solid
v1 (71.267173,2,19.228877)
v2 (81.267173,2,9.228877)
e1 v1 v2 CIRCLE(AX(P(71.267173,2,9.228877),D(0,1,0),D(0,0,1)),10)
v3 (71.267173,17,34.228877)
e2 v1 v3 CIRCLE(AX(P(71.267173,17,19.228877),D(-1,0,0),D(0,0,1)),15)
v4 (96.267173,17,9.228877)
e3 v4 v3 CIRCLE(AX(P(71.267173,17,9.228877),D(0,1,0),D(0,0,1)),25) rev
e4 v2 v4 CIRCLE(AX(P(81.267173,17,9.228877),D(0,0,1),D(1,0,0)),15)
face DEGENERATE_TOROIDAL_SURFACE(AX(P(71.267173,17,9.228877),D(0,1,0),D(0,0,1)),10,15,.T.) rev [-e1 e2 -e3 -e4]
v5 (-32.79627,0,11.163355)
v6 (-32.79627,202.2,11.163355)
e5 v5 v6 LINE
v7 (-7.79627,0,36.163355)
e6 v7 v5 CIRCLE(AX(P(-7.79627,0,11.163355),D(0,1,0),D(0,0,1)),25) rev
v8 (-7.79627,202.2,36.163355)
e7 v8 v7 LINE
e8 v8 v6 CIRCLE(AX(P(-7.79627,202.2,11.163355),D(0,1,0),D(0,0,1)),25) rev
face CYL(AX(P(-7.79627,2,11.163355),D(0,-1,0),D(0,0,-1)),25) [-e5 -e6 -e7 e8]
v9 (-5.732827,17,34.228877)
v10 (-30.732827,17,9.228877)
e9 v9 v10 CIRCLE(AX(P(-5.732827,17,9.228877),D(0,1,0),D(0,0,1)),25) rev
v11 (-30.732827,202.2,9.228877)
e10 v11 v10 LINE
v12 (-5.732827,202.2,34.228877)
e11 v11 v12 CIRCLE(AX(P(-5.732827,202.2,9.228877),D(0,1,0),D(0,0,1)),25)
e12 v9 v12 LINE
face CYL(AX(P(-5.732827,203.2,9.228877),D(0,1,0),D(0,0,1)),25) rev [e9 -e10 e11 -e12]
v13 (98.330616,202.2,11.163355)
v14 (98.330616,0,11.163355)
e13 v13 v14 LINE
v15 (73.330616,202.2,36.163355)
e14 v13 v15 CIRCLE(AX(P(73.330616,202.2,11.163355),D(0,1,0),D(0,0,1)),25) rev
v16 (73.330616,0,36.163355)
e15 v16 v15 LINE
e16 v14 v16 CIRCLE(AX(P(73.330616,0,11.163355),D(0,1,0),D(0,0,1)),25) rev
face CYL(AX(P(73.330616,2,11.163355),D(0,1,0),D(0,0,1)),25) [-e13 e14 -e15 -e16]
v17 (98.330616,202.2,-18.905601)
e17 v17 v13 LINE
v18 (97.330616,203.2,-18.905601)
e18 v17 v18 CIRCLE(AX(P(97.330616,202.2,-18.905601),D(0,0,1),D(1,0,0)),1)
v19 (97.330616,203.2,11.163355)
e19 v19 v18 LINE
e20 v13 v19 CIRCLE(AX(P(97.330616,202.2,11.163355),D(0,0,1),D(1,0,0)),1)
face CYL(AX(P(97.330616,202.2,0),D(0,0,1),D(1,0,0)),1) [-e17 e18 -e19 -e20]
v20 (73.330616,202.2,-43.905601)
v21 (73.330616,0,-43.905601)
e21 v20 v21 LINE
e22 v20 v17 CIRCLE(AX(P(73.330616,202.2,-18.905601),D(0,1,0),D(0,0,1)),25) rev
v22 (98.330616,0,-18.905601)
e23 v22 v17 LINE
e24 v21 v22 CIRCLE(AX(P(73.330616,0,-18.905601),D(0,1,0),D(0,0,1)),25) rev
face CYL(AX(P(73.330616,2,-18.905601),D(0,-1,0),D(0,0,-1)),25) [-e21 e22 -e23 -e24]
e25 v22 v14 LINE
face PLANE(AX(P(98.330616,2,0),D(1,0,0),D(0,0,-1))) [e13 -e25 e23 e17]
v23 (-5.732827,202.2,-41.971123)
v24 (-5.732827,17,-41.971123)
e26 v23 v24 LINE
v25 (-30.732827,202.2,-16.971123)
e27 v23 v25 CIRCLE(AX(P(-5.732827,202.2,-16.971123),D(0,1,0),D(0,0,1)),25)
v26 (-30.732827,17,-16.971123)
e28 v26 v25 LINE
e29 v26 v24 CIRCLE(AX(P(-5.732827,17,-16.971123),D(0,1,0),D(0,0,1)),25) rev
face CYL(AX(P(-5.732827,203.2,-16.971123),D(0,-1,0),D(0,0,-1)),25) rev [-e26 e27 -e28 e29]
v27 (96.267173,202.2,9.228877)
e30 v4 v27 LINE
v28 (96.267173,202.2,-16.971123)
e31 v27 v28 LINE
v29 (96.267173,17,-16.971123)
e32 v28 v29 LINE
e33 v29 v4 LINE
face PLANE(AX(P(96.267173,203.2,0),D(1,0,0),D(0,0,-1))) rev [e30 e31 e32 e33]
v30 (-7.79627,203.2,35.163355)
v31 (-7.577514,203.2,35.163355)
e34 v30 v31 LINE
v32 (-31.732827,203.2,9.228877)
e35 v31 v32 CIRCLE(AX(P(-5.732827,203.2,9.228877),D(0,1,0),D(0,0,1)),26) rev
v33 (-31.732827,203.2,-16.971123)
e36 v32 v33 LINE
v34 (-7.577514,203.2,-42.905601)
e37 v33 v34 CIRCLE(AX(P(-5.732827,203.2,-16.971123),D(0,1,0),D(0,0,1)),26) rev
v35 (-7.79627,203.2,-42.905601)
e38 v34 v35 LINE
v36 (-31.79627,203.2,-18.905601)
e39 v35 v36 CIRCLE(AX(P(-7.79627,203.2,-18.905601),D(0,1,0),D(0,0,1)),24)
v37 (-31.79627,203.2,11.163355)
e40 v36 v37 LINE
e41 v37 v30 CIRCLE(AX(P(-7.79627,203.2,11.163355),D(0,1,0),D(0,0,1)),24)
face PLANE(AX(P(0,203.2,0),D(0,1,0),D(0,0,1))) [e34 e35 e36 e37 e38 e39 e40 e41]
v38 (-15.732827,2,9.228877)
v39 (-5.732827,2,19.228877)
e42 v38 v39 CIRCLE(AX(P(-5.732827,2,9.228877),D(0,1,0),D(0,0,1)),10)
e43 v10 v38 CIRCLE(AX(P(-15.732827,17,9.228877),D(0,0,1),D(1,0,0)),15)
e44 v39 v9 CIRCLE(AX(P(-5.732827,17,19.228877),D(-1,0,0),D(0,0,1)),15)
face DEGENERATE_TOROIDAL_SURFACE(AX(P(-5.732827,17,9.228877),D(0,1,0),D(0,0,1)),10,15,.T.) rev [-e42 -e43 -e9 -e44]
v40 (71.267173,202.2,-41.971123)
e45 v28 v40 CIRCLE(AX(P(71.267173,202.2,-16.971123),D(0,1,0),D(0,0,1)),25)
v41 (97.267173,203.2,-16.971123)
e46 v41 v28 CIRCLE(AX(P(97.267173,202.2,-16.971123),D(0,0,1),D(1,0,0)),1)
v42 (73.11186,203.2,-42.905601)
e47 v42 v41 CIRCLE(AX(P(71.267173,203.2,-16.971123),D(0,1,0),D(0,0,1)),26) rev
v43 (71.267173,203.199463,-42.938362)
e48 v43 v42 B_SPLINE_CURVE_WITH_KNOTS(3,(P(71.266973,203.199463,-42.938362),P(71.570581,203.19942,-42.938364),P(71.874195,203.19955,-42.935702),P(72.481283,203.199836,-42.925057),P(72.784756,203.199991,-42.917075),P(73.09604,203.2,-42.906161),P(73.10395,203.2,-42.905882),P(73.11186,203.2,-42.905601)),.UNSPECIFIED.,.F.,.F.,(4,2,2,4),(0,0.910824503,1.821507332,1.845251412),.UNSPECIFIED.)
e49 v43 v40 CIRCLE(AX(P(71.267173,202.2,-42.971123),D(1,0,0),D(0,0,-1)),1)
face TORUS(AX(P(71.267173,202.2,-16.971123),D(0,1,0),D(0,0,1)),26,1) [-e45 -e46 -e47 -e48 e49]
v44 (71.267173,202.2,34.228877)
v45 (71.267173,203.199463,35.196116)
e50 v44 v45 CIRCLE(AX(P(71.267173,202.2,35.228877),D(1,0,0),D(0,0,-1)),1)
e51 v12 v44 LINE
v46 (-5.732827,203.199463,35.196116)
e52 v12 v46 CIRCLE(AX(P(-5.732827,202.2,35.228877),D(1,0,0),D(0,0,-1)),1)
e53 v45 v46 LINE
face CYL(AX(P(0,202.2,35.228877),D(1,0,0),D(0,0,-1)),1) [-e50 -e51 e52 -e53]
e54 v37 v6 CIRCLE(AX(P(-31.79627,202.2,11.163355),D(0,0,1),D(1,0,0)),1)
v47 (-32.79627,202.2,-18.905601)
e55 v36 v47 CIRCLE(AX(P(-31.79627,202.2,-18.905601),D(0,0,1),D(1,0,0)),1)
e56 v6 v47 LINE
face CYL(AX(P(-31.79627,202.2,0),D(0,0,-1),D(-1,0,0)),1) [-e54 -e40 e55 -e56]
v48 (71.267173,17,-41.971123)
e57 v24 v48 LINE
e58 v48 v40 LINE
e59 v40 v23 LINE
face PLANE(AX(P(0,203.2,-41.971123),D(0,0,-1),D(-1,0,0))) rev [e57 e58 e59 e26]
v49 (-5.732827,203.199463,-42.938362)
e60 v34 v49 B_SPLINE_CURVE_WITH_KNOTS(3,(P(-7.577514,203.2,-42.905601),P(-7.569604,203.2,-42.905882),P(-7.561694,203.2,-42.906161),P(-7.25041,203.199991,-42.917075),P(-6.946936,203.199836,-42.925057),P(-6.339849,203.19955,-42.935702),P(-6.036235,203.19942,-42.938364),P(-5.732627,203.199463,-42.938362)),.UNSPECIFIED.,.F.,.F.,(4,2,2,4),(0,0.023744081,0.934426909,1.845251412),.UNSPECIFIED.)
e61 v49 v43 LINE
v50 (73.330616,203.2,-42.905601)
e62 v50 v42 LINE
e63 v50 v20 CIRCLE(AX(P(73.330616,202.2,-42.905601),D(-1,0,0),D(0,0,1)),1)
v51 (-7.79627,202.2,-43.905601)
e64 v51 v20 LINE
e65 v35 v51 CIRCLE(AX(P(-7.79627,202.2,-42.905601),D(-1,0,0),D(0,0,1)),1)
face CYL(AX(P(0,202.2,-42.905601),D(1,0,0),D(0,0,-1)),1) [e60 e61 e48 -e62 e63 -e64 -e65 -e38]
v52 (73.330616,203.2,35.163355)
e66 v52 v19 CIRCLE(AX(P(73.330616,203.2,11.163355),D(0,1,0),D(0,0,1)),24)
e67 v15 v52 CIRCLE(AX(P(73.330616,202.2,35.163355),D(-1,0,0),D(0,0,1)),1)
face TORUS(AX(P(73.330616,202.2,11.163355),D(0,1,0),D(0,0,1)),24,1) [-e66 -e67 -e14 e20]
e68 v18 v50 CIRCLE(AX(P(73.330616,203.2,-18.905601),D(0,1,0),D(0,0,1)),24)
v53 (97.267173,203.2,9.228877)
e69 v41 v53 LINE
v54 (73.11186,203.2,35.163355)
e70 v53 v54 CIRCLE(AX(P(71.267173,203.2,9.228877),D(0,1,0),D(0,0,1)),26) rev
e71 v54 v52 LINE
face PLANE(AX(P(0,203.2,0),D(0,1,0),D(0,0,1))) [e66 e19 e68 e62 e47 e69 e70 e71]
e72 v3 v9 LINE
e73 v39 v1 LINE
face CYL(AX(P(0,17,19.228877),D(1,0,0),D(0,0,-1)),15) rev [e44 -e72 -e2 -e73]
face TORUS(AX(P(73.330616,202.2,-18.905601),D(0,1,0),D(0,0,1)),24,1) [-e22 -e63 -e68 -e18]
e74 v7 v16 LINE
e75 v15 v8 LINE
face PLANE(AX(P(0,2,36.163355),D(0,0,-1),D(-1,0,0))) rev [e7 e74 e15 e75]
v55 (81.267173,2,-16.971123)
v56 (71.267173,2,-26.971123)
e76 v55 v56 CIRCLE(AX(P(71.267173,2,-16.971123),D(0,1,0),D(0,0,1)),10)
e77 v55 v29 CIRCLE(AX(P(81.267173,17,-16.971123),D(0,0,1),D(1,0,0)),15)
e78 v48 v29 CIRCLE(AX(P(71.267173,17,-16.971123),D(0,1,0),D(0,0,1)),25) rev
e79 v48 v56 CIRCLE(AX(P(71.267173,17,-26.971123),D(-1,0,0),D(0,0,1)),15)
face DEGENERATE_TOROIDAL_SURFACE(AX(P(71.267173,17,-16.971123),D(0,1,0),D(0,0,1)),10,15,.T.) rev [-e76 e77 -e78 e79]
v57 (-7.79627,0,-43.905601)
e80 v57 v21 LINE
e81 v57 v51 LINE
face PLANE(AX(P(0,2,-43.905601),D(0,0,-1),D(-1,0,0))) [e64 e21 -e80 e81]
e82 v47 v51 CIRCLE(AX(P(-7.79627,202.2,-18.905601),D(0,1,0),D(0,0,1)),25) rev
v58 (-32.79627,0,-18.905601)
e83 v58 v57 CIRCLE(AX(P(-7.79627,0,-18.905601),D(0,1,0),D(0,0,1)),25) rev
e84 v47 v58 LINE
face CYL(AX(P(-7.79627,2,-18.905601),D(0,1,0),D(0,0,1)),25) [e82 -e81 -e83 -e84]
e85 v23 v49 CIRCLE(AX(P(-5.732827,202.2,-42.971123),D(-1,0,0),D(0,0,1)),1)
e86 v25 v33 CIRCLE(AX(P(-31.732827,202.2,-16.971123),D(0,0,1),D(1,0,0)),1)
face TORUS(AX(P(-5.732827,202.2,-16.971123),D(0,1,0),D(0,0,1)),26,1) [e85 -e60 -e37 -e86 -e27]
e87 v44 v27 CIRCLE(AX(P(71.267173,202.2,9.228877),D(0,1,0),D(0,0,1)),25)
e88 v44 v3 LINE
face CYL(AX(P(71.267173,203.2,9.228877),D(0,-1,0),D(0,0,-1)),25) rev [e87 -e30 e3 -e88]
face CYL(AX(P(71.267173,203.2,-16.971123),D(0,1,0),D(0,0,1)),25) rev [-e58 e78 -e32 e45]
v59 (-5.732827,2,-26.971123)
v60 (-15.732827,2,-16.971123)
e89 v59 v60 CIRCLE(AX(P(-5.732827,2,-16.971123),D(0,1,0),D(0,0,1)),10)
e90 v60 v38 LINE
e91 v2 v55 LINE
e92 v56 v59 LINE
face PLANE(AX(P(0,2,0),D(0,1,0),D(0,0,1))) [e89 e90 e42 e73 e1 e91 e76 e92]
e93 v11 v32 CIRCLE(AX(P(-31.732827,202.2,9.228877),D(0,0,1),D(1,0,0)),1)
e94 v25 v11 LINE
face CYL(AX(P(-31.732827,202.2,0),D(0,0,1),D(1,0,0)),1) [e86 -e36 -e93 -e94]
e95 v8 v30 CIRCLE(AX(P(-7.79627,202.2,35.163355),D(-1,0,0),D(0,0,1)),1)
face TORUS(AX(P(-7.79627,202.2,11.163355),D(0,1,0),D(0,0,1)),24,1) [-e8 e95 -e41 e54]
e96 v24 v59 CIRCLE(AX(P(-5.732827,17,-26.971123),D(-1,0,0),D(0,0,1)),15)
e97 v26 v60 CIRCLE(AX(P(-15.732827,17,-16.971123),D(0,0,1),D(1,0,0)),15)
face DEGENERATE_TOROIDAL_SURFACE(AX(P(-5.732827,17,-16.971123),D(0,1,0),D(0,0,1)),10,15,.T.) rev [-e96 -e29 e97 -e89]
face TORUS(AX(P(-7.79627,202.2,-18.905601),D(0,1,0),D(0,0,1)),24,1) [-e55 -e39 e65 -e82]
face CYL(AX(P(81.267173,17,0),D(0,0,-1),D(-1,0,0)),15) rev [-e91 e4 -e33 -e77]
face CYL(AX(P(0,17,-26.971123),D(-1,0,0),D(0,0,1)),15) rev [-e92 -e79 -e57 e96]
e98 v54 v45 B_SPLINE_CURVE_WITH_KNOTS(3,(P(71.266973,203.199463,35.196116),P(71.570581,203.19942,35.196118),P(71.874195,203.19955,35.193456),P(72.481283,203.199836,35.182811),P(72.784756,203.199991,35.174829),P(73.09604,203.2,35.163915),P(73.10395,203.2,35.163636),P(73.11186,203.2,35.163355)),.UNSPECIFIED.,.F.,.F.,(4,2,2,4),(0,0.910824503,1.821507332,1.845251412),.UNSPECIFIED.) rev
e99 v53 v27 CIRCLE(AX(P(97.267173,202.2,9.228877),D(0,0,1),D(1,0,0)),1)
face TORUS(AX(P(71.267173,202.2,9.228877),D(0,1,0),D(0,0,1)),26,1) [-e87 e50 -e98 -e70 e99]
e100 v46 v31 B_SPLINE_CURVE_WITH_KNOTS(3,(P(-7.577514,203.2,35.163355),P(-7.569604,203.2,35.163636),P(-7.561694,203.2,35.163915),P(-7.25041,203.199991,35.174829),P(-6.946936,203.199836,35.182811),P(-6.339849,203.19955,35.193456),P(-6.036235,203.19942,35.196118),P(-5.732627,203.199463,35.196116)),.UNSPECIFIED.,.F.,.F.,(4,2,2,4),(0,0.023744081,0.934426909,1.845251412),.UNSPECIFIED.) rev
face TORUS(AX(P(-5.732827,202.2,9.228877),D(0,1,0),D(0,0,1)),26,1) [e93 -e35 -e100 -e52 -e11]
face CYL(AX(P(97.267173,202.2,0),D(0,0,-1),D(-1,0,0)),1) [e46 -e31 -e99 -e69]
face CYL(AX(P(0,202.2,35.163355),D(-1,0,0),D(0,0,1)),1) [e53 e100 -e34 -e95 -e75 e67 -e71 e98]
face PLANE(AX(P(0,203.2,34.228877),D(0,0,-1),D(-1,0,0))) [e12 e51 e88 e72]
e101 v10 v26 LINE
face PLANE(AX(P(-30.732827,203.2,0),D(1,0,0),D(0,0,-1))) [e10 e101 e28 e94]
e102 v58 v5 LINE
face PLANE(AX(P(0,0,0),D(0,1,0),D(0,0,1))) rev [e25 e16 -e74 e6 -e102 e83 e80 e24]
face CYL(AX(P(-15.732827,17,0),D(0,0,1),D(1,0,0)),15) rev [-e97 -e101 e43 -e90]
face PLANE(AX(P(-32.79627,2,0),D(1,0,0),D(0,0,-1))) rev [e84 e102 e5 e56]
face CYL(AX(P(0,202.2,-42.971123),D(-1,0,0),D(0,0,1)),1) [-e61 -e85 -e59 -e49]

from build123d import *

# Parameters (mm, degrees)
SKETCH1_W           = 127
SKETCH1_H           = 76.2
BOSS_EXTRUDE1_DEPTH = 2
BOSS_EXTRUDE2_DEPTH = 203.2
FILLET2_R           = 25
FILLET3_R           = 15
FILLET4_R           = 1


with BuildPart() as part:
    # Sketch1 → Boss-Extrude1 (new body)
    with BuildSketch(Plane(origin=(0, 0, 0), x_dir=(1, 0, 0), z_dir=(0, 1, 0))):
        with Locations((32.767173068, 3.871122995)):
            Rectangle(SKETCH1_W, SKETCH1_H)
        Polygon((96.267173068, -34.228877005), (98.330615884, -36.163354646), (-32.796269749, -36.163354646), (-32.796269749, 43.905600635), (-30.732826932, 41.971122995), (-30.732826932, -34.228877005), align=None)
        Polygon((96.267173068, 41.971122995), (96.267173068, -34.228877005), (98.330615884, -36.163354646), (98.330615884, 43.905600635), align=None)
        Polygon((-30.732826932, 41.971122995), (96.267173068, 41.971122995), (98.330615884, 43.905600635), (-32.796269749, 43.905600635), align=None)
    extrude(amount=BOSS_EXTRUDE1_DEPTH)

    # Sketch1<3> → Boss-Extrude2 (add)
    with BuildSketch(Plane(origin=(0, 0, 0), x_dir=(1, 0, 0), z_dir=(0, 1, 0))):
        Polygon((96.267173068, 41.971122995), (96.267173068, -34.228877005), (98.330615884, -36.163354646), (98.330615884, 43.905600635), align=None)
        Polygon((-30.732826932, 41.971122995), (96.267173068, 41.971122995), (98.330615884, 43.905600635), (-32.796269749, 43.905600635), align=None)
        Polygon((96.267173068, -34.228877005), (98.330615884, -36.163354646), (-32.796269749, -36.163354646), (-32.796269749, 43.905600635), (-30.732826932, 41.971122995), (-30.732826932, -34.228877005), align=None)
    extrude(amount=BOSS_EXTRUDE2_DEPTH)

    # Fillet2
    fillet2_edges = [part.edges().sort_by_distance(p)[0] for p in [
        (96.267173068, 102.6, -41.971122995),
        (96.267173068, 102.6, 34.228877005),
        (-30.732826932, 102.6, 34.228877005),
        (-30.732826932, 102.6, -41.971122995),
        (98.330615884, 101.6, 36.163354646),
        (-32.796269749, 101.6, 36.163354646),
        (-32.796269749, 101.6, -43.905600635),
        (98.330615884, 101.6, -43.905600635),
    ]]
    fillet(fillet2_edges, radius=FILLET2_R)

    # Fillet3
    fillet3_edges = [part.edges().sort_by_distance(p)[0] for p in [
        (32.767173068, 2, -41.971122995),
        (32.767173068, 2, 34.228877005),
        (96.267173068, 2, -3.871122995),
        (-30.732826932, 2, -3.871122995),
        (88.944842597, 2, -34.648792524),
        (88.944842597, 2, 26.906546535),
        (-23.410496462, 2, 26.906546535),
        (-23.410496462, 2, -34.648792524),
    ]]
    fillet(fillet3_edges, radius=FILLET3_R)

    # Fillet4
    # the kernel refuses this fillet: 1 mm, written as the material it takes off along each edge
    with BuildSketch(Plane(origin=(-32.796269749, 203.2, 11.163354646), x_dir=(1, 0, 0), z_dir=(0, 0, -1))) as fillet4_piece_1:
        with BuildLine():
            CenterArc((FILLET4_R, FILLET4_R), FILLET4_R, 180, 90)
            Line((0, FILLET4_R), (0, 0))
            Line((0, 0), (FILLET4_R, 0))
        make_face()
    extrude(amount=30.068955281, mode=Mode.SUBTRACT)
    with BuildSketch(Plane(origin=(73.330615884, 203.2, -43.905600635), x_dir=(0, 0, 1), z_dir=(-1, 0, 0))) as fillet4_piece_2:
        with BuildLine():
            CenterArc((FILLET4_R, -FILLET4_R), FILLET4_R, 90, 90)
            Line((0, -FILLET4_R), (0, 0))
            Line((0, 0), (FILLET4_R, 0))
        make_face()
    extrude(amount=81.126885633, mode=Mode.SUBTRACT)
    with BuildSketch(Plane(origin=(73.330615884, 203.2, 36.163354646), x_dir=(0, 0, -1), z_dir=(-1, 0, 0))) as fillet4_piece_3:
        with BuildLine():
            CenterArc((FILLET4_R, FILLET4_R), FILLET4_R, 180, 90)
            Line((0, FILLET4_R), (0, 0))
            Line((0, 0), (FILLET4_R, 0))
        make_face()
    extrude(amount=81.126885633, mode=Mode.SUBTRACT)
    with BuildSketch(Plane(origin=(98.330615884, 203.2, 11.163354646), x_dir=(-1, 0, 0), z_dir=(0, 0, -1))) as fillet4_piece_4:
        with BuildLine():
            CenterArc((FILLET4_R, -FILLET4_R), FILLET4_R, 90, 90)
            Line((0, -FILLET4_R), (0, 0))
            Line((0, 0), (FILLET4_R, 0))
        make_face()
    extrude(amount=30.068955281, mode=Mode.SUBTRACT)
    with BuildSketch(Plane(origin=(-5.732826932, 203.2, -41.971122995), x_dir=(0, 0, -1), z_dir=(1, 0, 0))) as fillet4_piece_5:
        with BuildLine():
            CenterArc((FILLET4_R, -FILLET4_R), FILLET4_R, 90, 90)
            Line((0, -FILLET4_R), (0, 0))
            Line((0, 0), (FILLET4_R, 0))
        make_face()
    extrude(amount=77, mode=Mode.SUBTRACT)
    with BuildSketch(Plane(origin=(-30.732826932, 203.2, -16.971122995), x_dir=(-1, 0, 0), z_dir=(0, 0, 1)), Plane(origin=(96.267173068, 203.2, -16.971122995), x_dir=(0, -1, 0), z_dir=(0, 0, 1))) as fillet4_piece_6:
        with BuildLine():
            CenterArc((FILLET4_R, FILLET4_R), FILLET4_R, 180, 90)
            Line((0, FILLET4_R), (0, 0))
            Line((0, 0), (FILLET4_R, 0))
        make_face()
    extrude(amount=26.2, mode=Mode.SUBTRACT)
    with BuildSketch(Plane(origin=(-5.732826932, 203.2, 34.228877005), x_dir=(0, 0, 1), z_dir=(1, 0, 0))) as fillet4_piece_7:
        with BuildLine():
            CenterArc((FILLET4_R, FILLET4_R), FILLET4_R, 180, 90)
            Line((0, FILLET4_R), (0, 0))
            Line((0, 0), (FILLET4_R, 0))
        make_face()
    extrude(amount=77, mode=Mode.SUBTRACT)
    with BuildSketch(Plane(origin=(-5.732826932, 203.2, -16.971122995), x_dir=(0, 0, -1), z_dir=(1, 0, 0))) as fillet4_piece_8:
        with BuildLine():
            CenterArc((25 + FILLET4_R, -FILLET4_R), FILLET4_R, 90, 90)
            Line((25, -FILLET4_R), (25, 0))
            Line((25, 0), (25 + FILLET4_R, 0))
        make_face()
    revolve(axis=Axis((-5.732826932, 203.2, -16.971122995), (0, 1, 0)), revolution_arc=90, mode=Mode.SUBTRACT)
    with BuildSketch(Plane(origin=(-5.732826932, 203.2, 9.228877005), x_dir=(-1, 0, 0), z_dir=(0, 0, -1))) as fillet4_piece_9:
        with BuildLine():
            CenterArc((25 + FILLET4_R, -FILLET4_R), FILLET4_R, 90, 90)
            Line((25, -FILLET4_R), (25, 0))
            Line((25, 0), (25 + FILLET4_R, 0))
        make_face()
    revolve(axis=Axis((-5.732826932, 203.2, 9.228877005), (0, 1, 0)), revolution_arc=90, mode=Mode.SUBTRACT)
    with BuildSketch(Plane(origin=(71.267173068, 203.2, 9.228877005), x_dir=(0, 0, 1), z_dir=(-1, 0, 0))) as fillet4_piece_10:
        with BuildLine():
            CenterArc((25 + FILLET4_R, -FILLET4_R), FILLET4_R, 90, 90)
            Line((25, -FILLET4_R), (25, 0))
            Line((25, 0), (25 + FILLET4_R, 0))
        make_face()
    revolve(axis=Axis((71.267173068, 203.2, 9.228877005), (0, 1, 0)), revolution_arc=90, mode=Mode.SUBTRACT)
    with BuildSketch(Plane(origin=(71.267173068, 203.2, -16.971122995), x_dir=(0, 0, -1), z_dir=(-1, 0, 0))) as fillet4_piece_11:
        with BuildLine():
            CenterArc((25 + FILLET4_R, FILLET4_R), FILLET4_R, 180, 90)
            Line((25 + FILLET4_R, 0), (25, 0))
            Line((25, 0), (25, FILLET4_R))
        make_face()
    revolve(axis=Axis((71.267173068, 203.2, -16.971122995), (0, -1, 0)), revolution_arc=90, mode=Mode.SUBTRACT)
    with BuildSketch(Plane(origin=(73.330615884, 203.2, -18.905600635), x_dir=(1, 0, 0), z_dir=(0, 0, 1))) as fillet4_piece_12:
        with BuildLine():
            CenterArc((25 - FILLET4_R, -FILLET4_R), FILLET4_R, 0, 90)
            Line((25, -FILLET4_R), (25, 0))
            Line((25, 0), (25 - FILLET4_R, 0))
        make_face()
    revolve(axis=Axis((73.330615884, 203.2, -18.905600635), (0, 1, 0)), revolution_arc=90, mode=Mode.SUBTRACT)
    with BuildSketch(Plane(origin=(73.330615884, 203.2, 11.163354646), x_dir=(1, 0, 0), z_dir=(0, 0, -1))) as fillet4_piece_13:
        with BuildLine():
            CenterArc((25 - FILLET4_R, FILLET4_R), FILLET4_R, 270, 90)
            Line((25, FILLET4_R), (25, 0))
            Line((25, 0), (25 - FILLET4_R, 0))
        make_face()
    revolve(axis=Axis((73.330615884, 203.2, 11.163354646), (0, -1, 0)), revolution_arc=90, mode=Mode.SUBTRACT)
    with BuildSketch(Plane(origin=(-7.796269749, 203.2, 11.163354646), x_dir=(-1, 0, 0), z_dir=(0, 0, -1))) as fillet4_piece_14:
        with BuildLine():
            CenterArc((25 - FILLET4_R, -FILLET4_R), FILLET4_R, 0, 90)
            Line((25, -FILLET4_R), (25, 0))
            Line((25, 0), (25 - FILLET4_R, 0))
        make_face()
    revolve(axis=Axis((-7.796269749, 203.2, 11.163354646), (0, 1, 0)), revolution_arc=90, mode=Mode.SUBTRACT)
    with BuildSketch(Plane(origin=(-7.796269749, 203.2, -18.905600635), x_dir=(0, 0, -1), z_dir=(1, 0, 0))) as fillet4_piece_15:
        with BuildLine():
            CenterArc((25 - FILLET4_R, -FILLET4_R), FILLET4_R, 0, 90)
            Line((25, -FILLET4_R), (25, 0))
            Line((25, 0), (25 - FILLET4_R, 0))
        make_face()
    revolve(axis=Axis((-7.796269749, 203.2, -18.905600635), (0, 1, 0)), revolution_arc=90, mode=Mode.SUBTRACT)


solid = part.part
